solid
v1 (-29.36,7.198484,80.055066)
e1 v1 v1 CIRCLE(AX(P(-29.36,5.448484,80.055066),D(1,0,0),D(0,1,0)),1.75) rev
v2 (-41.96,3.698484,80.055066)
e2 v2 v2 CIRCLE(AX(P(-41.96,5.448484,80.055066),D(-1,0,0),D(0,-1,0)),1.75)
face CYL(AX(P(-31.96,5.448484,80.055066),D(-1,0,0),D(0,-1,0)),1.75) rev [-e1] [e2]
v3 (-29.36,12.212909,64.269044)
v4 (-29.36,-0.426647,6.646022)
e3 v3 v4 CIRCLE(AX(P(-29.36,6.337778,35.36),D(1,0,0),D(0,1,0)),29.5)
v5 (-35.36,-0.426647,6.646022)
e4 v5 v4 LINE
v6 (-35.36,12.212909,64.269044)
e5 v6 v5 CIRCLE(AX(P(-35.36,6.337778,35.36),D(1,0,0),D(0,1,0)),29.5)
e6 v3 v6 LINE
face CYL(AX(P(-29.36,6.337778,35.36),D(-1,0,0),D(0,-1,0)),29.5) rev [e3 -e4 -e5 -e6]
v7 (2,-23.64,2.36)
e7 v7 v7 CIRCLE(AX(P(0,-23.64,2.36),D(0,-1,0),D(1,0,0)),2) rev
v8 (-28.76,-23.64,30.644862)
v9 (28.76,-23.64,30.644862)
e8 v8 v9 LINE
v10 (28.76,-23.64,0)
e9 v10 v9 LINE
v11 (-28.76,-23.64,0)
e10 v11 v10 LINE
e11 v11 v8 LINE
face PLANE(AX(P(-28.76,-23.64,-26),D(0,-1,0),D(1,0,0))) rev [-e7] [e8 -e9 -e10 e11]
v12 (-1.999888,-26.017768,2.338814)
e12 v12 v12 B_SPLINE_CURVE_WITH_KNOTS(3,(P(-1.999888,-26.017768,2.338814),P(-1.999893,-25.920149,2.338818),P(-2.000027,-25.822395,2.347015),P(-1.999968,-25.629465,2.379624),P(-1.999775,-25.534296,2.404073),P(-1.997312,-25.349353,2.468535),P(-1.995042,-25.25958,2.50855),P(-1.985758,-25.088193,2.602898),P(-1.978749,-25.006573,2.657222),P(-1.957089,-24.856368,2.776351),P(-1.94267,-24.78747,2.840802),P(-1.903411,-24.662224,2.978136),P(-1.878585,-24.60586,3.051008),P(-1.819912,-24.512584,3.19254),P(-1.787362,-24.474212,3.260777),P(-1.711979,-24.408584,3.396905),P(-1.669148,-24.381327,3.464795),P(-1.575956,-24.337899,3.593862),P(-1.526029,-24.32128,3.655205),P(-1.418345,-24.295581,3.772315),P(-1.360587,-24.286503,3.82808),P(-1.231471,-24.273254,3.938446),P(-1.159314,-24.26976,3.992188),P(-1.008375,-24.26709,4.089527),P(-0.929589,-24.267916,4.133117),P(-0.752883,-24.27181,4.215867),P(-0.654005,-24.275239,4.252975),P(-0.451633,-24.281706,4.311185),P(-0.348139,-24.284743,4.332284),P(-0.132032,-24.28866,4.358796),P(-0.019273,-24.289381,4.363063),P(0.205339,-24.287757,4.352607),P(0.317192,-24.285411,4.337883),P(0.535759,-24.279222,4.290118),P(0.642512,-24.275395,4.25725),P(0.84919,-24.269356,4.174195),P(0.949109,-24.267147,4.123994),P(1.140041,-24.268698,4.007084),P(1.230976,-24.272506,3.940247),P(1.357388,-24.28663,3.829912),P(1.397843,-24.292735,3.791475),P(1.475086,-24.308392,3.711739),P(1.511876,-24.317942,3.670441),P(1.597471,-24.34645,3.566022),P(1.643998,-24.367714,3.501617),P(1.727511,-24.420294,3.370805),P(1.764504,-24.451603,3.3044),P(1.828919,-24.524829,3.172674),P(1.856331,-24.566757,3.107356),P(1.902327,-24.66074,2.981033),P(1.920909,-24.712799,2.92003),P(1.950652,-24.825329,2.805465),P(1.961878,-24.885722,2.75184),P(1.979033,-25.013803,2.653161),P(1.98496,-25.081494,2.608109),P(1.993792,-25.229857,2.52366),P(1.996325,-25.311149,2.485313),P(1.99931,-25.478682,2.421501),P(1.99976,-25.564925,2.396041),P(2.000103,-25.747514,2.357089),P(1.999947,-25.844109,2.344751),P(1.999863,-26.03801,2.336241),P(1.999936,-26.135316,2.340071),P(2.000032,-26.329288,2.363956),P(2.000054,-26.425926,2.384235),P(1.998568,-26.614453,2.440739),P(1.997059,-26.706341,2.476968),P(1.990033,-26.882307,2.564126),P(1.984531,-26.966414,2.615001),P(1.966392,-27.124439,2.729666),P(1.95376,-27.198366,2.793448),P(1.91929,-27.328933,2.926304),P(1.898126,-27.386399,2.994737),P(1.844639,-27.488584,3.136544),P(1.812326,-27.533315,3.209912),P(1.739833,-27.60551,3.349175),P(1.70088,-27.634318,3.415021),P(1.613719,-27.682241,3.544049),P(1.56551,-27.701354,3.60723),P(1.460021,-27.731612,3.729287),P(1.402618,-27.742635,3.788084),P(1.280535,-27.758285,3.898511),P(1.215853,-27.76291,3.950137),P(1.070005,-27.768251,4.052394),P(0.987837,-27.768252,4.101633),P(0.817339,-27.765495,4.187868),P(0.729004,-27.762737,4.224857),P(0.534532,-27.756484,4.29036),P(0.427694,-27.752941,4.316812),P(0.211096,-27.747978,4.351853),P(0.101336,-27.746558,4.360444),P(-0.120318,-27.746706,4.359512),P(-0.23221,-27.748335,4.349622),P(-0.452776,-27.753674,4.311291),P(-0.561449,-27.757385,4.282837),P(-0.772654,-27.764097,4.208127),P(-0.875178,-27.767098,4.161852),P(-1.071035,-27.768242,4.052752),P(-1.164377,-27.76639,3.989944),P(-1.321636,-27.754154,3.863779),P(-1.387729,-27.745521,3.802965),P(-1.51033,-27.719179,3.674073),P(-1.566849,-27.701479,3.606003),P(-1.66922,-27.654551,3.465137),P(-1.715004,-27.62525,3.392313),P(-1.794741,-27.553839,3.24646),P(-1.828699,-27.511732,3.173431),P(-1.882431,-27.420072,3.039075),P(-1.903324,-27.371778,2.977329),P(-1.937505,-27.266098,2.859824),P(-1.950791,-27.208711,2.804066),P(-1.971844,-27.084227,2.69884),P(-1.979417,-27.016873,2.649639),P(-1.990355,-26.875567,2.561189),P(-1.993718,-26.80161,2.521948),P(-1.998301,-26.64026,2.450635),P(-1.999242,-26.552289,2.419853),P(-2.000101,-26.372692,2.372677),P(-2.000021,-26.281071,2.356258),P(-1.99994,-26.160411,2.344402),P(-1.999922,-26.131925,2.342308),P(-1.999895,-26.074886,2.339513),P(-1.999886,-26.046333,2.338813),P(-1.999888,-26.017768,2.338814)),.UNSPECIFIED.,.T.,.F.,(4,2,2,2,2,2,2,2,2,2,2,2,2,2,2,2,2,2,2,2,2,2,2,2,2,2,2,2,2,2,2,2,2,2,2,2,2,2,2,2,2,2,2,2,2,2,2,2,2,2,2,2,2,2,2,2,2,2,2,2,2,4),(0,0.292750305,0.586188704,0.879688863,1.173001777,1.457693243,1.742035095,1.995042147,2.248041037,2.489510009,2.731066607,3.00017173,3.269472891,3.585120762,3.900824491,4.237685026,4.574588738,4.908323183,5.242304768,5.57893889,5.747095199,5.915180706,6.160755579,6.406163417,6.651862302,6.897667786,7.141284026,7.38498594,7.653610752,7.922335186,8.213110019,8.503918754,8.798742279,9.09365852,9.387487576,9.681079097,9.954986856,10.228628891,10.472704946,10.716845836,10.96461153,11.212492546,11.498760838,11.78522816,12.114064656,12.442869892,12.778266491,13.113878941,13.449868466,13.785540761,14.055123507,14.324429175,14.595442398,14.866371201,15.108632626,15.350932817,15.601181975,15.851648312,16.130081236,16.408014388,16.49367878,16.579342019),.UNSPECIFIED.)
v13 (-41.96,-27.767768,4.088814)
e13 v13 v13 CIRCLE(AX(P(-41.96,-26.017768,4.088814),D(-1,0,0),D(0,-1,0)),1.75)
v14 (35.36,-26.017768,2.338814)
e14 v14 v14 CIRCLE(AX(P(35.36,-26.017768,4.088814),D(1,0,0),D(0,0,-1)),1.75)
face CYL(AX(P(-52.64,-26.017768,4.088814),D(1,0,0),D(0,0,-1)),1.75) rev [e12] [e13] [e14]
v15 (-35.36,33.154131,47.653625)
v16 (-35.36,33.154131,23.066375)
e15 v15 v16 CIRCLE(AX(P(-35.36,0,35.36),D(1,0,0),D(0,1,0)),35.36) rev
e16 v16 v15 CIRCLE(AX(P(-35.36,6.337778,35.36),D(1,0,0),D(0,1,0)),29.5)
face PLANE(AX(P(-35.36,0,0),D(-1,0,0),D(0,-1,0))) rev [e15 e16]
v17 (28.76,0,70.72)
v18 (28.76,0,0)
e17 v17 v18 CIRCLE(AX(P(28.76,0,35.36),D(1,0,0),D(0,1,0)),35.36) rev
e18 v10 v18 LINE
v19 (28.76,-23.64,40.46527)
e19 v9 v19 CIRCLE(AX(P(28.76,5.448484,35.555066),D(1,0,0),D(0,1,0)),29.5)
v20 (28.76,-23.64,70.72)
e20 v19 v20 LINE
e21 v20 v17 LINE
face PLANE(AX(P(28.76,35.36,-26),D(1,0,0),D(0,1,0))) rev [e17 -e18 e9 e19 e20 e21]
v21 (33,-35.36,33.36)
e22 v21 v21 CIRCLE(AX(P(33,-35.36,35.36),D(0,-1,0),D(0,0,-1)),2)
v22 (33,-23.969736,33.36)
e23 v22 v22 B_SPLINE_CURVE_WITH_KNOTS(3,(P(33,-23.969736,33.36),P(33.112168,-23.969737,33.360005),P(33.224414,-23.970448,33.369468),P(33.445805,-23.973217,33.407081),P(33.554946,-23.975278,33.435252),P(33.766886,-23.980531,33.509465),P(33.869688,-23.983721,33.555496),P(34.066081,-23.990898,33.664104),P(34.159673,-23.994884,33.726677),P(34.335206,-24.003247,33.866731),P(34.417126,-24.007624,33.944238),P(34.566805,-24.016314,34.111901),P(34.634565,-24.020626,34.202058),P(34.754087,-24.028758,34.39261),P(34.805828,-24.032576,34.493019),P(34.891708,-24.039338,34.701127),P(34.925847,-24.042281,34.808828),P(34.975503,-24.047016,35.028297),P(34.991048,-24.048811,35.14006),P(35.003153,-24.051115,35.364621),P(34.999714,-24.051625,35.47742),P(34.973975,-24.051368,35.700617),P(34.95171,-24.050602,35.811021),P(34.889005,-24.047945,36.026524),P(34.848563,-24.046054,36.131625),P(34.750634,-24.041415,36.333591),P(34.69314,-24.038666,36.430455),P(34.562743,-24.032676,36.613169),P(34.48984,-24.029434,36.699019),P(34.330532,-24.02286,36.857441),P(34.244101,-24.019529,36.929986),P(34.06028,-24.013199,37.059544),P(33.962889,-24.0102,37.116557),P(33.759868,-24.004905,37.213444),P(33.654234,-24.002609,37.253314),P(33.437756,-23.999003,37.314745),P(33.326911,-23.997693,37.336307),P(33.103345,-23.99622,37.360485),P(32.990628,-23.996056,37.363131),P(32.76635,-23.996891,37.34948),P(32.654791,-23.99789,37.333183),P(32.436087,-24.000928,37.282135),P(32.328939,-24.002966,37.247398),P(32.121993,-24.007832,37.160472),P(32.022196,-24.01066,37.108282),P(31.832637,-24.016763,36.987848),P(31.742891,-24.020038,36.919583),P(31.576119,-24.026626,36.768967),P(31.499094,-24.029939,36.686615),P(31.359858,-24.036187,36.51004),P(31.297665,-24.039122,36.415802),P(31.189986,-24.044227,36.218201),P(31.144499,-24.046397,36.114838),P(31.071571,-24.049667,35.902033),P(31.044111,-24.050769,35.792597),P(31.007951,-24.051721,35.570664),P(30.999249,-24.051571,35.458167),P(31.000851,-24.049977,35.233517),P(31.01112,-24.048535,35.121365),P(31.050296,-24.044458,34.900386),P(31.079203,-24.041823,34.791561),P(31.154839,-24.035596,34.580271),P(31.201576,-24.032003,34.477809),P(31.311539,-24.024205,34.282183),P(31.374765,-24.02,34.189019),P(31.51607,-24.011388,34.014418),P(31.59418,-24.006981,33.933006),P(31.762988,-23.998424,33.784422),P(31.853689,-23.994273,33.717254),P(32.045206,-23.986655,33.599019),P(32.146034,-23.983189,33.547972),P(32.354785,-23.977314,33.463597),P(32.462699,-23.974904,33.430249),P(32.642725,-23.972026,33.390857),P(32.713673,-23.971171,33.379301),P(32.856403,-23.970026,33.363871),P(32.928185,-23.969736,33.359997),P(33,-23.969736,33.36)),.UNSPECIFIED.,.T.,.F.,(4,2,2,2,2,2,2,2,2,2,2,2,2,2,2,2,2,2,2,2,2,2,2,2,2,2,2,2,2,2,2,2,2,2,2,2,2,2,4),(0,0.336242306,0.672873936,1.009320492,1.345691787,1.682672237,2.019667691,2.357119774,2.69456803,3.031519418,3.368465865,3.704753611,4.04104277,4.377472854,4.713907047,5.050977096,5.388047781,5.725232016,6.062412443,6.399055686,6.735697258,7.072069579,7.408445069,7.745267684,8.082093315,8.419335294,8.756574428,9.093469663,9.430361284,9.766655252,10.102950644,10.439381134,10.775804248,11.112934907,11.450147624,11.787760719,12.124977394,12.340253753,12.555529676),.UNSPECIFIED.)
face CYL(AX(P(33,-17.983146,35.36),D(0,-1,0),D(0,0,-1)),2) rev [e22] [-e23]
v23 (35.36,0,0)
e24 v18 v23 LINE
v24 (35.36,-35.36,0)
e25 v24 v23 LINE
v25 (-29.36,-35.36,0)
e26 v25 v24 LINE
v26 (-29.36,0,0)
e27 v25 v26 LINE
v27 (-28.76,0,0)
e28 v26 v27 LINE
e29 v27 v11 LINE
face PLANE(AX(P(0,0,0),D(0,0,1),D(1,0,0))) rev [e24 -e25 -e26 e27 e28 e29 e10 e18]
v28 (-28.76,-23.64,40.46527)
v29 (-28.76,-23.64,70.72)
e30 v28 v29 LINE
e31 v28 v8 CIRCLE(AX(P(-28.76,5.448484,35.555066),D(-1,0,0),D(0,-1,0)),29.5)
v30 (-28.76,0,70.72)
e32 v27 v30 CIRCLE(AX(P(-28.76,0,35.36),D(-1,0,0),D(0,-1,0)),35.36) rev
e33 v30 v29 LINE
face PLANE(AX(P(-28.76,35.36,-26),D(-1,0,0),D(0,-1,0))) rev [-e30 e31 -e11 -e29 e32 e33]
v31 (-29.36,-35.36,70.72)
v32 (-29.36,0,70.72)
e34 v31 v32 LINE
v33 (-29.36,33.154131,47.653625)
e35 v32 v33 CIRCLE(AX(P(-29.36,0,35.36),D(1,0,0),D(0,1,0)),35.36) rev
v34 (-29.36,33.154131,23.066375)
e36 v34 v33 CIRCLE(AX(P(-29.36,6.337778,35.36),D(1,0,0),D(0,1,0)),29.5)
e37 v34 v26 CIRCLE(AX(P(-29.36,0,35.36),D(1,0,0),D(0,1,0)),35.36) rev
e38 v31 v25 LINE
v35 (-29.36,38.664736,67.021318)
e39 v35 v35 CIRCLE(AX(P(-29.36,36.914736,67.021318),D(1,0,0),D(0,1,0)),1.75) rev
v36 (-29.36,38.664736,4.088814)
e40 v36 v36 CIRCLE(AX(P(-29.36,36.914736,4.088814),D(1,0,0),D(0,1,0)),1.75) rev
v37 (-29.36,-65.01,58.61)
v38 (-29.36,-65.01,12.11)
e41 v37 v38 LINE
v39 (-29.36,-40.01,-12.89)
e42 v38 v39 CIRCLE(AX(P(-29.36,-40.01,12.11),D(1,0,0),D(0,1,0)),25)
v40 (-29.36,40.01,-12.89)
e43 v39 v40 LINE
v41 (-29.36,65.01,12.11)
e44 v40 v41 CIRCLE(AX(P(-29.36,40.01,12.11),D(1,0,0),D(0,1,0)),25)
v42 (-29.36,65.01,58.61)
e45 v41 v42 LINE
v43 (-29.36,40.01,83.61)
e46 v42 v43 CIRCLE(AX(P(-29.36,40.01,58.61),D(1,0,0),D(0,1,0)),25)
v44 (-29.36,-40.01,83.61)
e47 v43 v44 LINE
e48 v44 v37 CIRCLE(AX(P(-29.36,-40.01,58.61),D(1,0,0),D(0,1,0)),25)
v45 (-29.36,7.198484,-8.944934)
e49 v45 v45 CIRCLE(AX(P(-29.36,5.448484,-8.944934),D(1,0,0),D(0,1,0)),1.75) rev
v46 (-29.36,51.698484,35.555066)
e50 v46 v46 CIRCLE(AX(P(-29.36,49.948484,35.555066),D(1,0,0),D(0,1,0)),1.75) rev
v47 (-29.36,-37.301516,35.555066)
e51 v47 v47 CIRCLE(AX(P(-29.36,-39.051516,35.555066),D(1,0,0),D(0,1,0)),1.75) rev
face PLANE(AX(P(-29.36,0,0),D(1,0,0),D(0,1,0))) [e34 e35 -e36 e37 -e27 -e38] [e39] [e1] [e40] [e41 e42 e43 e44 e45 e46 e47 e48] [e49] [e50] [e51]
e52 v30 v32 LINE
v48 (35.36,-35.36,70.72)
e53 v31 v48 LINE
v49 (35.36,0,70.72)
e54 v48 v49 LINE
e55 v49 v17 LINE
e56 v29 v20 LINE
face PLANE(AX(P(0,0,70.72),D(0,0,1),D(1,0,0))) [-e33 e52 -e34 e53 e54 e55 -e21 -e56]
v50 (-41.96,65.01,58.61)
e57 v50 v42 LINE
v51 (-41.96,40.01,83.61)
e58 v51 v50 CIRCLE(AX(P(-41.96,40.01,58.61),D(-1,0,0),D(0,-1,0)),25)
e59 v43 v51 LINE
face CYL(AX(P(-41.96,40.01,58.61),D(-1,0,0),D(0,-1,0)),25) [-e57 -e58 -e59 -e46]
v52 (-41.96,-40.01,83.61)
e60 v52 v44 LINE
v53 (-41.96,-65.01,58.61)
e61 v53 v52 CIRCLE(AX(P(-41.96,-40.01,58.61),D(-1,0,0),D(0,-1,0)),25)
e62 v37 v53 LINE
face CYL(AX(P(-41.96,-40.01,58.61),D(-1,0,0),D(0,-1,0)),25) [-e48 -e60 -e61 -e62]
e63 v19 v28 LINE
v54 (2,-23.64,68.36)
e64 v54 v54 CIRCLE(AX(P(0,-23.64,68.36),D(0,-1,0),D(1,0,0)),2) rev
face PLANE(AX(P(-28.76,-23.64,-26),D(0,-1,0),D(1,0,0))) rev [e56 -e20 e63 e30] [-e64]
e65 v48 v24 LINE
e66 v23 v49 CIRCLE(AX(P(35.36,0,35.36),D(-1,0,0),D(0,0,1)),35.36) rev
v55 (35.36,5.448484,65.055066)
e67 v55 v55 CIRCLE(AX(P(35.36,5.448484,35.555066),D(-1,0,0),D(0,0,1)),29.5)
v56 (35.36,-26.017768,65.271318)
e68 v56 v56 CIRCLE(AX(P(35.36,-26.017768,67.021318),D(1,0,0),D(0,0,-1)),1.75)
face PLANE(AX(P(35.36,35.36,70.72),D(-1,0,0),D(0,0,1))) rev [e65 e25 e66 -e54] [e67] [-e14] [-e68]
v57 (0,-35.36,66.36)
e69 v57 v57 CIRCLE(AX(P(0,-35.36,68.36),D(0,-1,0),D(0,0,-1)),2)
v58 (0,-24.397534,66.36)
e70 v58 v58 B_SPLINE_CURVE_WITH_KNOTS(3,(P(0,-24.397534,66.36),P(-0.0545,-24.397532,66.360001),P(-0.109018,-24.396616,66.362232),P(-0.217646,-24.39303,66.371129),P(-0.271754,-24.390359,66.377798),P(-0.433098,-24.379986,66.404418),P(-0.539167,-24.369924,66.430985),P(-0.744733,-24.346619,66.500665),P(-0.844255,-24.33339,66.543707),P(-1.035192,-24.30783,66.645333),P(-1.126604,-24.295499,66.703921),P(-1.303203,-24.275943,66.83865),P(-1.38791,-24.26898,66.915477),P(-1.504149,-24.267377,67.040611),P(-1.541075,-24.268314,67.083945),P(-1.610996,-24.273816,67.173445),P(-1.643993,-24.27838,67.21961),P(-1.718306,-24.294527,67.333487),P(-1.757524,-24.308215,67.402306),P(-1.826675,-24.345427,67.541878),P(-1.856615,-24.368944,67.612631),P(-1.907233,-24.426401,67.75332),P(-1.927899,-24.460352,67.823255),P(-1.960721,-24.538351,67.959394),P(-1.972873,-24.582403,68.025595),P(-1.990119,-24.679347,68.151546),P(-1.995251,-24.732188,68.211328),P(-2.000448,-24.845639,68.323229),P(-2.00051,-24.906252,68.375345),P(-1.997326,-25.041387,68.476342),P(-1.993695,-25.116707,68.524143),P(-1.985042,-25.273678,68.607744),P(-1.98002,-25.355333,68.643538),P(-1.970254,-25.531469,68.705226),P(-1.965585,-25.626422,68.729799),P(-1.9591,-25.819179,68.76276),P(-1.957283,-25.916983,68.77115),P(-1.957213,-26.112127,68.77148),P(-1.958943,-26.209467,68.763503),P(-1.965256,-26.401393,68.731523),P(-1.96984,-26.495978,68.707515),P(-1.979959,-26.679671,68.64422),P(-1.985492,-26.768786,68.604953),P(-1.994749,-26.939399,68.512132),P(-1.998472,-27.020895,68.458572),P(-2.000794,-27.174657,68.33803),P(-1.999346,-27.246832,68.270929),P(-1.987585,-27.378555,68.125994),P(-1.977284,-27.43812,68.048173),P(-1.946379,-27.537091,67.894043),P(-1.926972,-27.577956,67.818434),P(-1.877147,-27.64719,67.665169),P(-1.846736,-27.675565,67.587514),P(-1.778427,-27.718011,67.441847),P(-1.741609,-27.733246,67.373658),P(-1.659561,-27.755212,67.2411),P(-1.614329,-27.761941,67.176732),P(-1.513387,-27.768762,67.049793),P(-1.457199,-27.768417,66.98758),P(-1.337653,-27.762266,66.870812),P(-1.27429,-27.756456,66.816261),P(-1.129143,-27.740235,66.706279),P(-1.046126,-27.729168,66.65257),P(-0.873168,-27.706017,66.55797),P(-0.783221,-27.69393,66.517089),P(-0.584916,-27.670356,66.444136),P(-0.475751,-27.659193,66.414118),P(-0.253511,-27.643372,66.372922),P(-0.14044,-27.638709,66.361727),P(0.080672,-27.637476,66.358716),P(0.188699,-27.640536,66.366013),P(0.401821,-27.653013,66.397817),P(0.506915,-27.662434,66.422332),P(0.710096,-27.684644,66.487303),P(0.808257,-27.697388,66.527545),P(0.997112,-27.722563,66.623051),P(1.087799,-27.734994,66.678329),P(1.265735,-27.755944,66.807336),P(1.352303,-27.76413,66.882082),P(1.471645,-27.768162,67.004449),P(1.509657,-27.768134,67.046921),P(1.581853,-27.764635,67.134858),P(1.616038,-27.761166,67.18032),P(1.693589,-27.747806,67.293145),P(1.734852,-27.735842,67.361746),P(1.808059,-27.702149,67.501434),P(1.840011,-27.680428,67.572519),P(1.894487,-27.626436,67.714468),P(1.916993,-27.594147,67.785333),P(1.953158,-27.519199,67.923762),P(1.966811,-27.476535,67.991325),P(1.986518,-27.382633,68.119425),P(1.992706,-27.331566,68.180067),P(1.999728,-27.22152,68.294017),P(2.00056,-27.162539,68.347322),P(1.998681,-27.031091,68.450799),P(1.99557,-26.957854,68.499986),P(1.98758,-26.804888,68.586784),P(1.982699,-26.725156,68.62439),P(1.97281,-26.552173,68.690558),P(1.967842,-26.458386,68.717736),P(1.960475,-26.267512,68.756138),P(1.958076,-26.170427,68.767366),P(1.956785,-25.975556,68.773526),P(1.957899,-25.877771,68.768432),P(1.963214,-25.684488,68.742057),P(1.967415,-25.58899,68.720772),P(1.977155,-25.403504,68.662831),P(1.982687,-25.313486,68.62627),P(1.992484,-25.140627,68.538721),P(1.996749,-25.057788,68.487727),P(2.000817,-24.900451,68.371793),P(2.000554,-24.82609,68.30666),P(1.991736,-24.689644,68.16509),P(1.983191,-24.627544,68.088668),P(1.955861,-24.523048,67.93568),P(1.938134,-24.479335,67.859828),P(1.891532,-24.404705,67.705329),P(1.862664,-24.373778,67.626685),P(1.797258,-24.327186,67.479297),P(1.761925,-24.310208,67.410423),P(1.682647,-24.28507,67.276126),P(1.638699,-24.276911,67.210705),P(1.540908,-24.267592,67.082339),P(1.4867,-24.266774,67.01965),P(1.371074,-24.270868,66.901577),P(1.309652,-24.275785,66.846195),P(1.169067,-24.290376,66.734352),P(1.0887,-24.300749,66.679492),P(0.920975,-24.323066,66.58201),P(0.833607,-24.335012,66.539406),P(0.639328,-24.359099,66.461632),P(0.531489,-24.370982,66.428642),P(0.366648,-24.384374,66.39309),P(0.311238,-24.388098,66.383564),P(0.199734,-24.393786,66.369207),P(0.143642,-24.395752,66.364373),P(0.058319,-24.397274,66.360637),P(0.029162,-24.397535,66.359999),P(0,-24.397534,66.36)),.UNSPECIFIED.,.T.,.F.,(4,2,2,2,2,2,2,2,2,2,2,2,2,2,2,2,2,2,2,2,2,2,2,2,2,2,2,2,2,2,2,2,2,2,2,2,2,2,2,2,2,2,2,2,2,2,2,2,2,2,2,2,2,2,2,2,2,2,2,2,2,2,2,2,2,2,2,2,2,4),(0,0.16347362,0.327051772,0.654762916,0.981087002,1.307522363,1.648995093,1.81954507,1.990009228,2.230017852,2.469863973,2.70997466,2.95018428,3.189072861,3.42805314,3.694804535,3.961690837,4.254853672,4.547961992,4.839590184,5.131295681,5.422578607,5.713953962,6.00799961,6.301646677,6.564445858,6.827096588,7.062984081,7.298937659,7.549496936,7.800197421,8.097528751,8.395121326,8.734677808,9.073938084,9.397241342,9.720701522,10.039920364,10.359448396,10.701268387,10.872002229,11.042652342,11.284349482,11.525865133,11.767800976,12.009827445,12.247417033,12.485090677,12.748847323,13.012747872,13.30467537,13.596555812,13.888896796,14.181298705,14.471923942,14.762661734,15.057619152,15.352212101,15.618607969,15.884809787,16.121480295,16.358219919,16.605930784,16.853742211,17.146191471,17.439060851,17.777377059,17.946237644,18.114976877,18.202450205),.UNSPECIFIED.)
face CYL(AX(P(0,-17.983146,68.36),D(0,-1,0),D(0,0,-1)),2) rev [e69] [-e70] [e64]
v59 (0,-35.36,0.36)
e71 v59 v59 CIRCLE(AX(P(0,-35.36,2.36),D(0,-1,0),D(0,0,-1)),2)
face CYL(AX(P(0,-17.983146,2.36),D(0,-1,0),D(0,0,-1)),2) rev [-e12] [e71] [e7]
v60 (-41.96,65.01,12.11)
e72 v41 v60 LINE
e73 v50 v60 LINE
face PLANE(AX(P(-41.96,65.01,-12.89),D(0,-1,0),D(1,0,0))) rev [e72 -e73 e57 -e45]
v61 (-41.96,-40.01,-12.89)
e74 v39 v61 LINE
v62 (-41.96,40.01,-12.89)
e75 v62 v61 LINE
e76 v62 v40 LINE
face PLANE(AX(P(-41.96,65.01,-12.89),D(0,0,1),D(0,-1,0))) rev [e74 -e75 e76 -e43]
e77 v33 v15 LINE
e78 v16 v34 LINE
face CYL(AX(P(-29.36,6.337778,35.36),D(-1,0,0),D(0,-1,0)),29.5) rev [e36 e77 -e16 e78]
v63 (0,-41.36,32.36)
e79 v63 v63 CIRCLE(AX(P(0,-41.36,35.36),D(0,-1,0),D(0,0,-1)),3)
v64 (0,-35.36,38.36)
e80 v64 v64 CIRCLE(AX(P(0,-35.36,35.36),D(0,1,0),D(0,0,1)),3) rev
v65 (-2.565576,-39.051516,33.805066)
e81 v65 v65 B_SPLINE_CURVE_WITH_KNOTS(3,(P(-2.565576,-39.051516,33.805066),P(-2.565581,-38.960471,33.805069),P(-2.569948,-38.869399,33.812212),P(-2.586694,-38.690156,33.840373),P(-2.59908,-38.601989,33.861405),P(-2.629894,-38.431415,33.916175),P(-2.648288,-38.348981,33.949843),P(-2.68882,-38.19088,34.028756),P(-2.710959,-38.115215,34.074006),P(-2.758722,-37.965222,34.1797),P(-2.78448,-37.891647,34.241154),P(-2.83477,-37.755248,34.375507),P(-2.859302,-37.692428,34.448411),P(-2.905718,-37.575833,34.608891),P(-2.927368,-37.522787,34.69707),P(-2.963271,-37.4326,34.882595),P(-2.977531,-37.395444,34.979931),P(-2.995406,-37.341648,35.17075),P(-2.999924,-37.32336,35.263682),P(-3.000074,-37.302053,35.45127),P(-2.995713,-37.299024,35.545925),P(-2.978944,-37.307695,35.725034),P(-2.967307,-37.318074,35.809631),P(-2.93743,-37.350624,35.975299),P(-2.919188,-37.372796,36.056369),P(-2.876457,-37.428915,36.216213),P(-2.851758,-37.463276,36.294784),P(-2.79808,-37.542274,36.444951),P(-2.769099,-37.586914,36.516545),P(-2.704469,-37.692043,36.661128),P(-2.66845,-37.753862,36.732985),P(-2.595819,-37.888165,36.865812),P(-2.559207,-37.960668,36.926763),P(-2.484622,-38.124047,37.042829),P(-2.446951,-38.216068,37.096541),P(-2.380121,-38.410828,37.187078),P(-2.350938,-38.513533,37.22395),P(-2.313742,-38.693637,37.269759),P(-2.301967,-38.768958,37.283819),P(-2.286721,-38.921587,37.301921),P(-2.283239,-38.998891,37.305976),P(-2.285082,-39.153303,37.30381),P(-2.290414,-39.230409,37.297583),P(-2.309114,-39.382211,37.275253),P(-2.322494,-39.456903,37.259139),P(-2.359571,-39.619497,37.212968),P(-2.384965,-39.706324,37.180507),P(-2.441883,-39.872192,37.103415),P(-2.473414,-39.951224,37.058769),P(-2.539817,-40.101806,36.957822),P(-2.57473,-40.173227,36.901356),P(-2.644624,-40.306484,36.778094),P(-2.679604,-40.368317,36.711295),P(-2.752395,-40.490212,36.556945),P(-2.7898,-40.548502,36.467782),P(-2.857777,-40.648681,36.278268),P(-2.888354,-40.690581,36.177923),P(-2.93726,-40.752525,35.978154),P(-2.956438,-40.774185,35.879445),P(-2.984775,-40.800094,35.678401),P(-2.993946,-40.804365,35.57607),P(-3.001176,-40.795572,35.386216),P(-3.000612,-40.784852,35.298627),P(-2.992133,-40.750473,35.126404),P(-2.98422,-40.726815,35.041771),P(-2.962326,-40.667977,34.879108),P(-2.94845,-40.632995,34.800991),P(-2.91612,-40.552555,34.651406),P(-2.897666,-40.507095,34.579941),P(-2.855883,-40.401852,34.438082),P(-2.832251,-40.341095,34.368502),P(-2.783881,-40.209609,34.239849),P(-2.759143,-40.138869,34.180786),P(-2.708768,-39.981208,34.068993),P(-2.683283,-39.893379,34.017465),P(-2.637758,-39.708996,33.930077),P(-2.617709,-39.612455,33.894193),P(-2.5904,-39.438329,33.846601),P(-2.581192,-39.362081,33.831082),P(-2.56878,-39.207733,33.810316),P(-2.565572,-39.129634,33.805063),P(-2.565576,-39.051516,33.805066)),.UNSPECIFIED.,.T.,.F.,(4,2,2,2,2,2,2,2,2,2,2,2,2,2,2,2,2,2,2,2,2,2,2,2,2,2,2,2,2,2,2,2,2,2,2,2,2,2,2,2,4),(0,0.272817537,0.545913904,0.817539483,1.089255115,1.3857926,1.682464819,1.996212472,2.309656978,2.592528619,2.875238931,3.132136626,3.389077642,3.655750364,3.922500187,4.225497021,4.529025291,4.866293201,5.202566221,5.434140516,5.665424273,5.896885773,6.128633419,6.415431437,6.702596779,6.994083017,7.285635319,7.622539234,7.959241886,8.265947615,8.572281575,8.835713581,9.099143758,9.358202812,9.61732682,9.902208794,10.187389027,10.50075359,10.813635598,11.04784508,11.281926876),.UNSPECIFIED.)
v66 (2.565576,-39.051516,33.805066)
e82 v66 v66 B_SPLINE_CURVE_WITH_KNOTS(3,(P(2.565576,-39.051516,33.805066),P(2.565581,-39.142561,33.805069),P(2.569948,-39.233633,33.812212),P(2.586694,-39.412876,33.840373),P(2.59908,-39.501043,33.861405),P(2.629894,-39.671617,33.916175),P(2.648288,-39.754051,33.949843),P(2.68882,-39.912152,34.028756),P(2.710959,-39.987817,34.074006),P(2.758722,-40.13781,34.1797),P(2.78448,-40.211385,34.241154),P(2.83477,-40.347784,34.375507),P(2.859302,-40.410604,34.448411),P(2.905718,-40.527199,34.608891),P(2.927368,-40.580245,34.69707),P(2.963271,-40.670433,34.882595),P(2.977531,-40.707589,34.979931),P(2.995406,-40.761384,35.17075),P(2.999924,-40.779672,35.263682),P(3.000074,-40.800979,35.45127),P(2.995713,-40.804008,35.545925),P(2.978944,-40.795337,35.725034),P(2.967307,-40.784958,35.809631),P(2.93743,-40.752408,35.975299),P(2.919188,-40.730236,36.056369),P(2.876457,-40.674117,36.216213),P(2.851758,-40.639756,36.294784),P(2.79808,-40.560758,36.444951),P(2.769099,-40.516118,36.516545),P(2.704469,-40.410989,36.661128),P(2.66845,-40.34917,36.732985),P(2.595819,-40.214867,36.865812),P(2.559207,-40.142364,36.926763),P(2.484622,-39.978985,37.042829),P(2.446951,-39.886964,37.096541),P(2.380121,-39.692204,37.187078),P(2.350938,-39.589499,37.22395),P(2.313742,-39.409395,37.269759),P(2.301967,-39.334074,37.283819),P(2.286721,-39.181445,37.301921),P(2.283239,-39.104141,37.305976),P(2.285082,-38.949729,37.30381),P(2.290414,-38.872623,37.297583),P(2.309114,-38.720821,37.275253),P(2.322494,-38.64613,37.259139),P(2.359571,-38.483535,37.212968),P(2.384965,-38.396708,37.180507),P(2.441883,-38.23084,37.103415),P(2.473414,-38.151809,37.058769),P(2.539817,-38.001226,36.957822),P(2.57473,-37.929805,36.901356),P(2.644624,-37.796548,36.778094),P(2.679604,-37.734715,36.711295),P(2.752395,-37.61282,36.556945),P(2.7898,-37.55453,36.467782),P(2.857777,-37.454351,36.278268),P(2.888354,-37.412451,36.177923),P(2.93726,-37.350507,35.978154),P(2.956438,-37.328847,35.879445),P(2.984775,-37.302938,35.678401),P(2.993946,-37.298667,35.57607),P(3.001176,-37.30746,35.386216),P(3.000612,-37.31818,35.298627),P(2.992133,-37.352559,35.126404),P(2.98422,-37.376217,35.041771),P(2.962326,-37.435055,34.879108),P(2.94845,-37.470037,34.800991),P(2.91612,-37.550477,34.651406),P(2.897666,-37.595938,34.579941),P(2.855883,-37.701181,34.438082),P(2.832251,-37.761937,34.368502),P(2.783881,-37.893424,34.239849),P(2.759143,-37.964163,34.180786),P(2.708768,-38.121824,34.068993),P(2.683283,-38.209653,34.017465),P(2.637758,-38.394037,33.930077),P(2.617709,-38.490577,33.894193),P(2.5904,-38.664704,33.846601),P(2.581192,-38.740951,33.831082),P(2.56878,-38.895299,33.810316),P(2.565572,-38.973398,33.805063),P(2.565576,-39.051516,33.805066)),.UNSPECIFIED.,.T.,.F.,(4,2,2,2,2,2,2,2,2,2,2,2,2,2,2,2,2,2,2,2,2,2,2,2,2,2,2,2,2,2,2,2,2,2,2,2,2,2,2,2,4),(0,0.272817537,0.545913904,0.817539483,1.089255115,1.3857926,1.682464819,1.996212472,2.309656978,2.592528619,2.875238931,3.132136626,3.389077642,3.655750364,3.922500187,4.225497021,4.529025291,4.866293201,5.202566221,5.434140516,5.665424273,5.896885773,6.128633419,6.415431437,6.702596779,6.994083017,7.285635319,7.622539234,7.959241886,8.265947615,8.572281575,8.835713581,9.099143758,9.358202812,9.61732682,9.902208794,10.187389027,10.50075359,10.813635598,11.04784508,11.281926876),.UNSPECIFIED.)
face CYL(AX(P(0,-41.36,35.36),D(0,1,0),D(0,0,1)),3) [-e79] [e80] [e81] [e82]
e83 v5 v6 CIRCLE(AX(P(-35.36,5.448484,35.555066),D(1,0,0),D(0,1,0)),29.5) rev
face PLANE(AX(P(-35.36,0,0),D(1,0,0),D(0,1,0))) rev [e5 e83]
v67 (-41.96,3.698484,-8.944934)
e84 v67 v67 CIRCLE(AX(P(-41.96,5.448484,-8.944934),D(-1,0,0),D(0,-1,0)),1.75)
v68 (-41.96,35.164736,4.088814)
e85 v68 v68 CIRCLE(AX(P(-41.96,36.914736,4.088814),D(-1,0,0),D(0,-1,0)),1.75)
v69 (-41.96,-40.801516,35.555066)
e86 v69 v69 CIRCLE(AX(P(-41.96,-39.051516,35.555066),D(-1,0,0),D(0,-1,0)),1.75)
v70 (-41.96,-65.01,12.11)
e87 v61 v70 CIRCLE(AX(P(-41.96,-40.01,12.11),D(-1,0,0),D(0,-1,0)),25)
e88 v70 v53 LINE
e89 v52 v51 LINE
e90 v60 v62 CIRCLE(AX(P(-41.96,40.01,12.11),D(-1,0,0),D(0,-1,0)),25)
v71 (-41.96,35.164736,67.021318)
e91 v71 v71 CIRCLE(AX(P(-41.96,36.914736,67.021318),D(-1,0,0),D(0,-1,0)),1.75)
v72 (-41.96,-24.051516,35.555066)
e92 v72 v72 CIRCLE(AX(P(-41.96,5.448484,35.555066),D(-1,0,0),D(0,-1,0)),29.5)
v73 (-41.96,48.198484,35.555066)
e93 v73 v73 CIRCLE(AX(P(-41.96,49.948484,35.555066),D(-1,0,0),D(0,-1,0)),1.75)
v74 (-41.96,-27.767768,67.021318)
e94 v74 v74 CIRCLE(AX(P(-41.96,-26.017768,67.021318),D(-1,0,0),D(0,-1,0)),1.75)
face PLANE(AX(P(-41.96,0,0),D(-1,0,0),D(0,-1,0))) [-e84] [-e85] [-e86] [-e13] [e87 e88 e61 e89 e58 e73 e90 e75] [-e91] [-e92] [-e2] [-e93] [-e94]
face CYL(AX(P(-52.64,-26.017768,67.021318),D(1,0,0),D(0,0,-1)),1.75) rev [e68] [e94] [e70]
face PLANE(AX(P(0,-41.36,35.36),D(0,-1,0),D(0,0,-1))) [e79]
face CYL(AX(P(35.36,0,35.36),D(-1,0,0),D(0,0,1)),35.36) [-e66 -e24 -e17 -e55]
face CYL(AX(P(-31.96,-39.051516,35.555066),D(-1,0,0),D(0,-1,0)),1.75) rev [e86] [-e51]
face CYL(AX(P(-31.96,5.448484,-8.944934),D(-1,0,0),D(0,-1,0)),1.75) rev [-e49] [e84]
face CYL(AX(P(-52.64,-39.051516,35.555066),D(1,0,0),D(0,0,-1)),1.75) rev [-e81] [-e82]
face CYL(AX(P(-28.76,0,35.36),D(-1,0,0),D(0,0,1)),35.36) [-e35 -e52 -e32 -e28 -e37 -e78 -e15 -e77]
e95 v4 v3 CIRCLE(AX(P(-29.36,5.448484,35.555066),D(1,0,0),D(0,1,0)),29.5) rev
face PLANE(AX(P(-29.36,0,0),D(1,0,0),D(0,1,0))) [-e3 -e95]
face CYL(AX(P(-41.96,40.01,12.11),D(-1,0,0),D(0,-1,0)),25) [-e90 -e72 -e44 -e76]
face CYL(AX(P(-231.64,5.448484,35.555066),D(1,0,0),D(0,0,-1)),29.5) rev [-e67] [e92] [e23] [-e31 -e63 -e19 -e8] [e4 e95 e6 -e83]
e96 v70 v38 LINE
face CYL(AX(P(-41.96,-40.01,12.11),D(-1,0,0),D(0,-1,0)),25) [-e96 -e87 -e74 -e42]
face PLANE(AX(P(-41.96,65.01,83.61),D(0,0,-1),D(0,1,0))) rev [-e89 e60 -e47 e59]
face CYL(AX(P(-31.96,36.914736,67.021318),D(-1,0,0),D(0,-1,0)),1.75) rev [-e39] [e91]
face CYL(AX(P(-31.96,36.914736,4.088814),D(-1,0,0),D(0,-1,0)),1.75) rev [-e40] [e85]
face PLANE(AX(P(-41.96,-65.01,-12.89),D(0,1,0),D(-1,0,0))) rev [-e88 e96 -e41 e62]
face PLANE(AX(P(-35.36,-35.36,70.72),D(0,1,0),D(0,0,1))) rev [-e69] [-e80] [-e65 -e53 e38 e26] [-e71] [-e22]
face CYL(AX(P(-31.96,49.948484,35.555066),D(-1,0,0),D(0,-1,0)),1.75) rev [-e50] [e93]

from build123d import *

# Parameters (mm, degrees)
SKETCH_1_W               = 70.72
SKETCH_1_H               = 70.72
EXTRUDE_1_DEPTH          = 70.72
CUT_EXTRUDE_2_DEPTH      = 125.72
CUT_EXTRUDE_2_DEPTH_BACK = 26
SKETCH_2_W               = 57.52
SKETCH_2_H               = 59
FILLET_1_RADIUS          = 35.36
FILLET_1_LENGTH          = 6.6
FILLET_2_RADIUS          = 35.36
FILLET_2_LENGTH          = 6.6
CUT_EXTRUDE_4_DEPTH      = 1
CUT_EXTRUDE_4_DEPTH_BACK = 267
SKETCH_3_R               = 29.5
SKETCH_8_R               = 3
EXTRUDE_2_DEPTH          = 6
SKETCH_11_R              = 1.75
CUT_EXTRUDE_5_DEPTH      = 88
SKETCH_14_W              = 96.5
SKETCH_14_H              = 130.02
EXTRUDE_3_DEPTH          = 6.6
SKETCH_21_R              = 29.5
CUT_EXTRUDE_7_DEPTH      = 51
CUT_EXTRUDE_START        = -10
SKETCH_24_R              = 1.75
CUT_EXTRUDE_8_DEPTH      = 10
EXTRUDE_4_OUTLINE_W      = 96.5
EXTRUDE_4_OUTLINE_H      = 130.02
EXTRUDE_4_DEPTH          = 6
CUT_EXTRUDE_START_2      = 32
SKETCH_27_R              = 1.75
CUT_EXTRUDE_13_DEPTH     = 32
CUT_EXTRUDE_15_REACH     = 139.206
SKETCH_29_R              = 2
FILLET_3_R               = 25
FILLET_4_R               = 25
FILLET_5_R               = 25
FILLET_6_R               = 25


# Read off the part's stored shape, not the designer's step: 凸台-拉伸4
with BuildPart() as part:
    # 草图1 → 凸台-拉伸1 (new body)
    with BuildSketch(Plane.XY):
        Rectangle(SKETCH_1_W, SKETCH_1_H)
    extrude(amount=EXTRUDE_1_DEPTH)

    # 草图2 → 切除-拉伸2 (cut, two sides: drawn at the far end of the back side and taken through both)
    with BuildSketch(Plane.XY.offset(-CUT_EXTRUDE_2_DEPTH_BACK)):
        with Locations((0, 5.86)):
            Rectangle(SKETCH_2_W, SKETCH_2_H)
    extrude(amount=CUT_EXTRUDE_2_DEPTH + CUT_EXTRUDE_2_DEPTH_BACK, mode=Mode.SUBTRACT)

    # 圆角1: full round fillet: the end face becomes a half cylinder, R = half its width
    fillet_1_face = Plane((-32.06, 35.36, 35.36), x_dir=(-1, 0, 0), z_dir=(0, 1, 0))  # on the end face: x along it, z out of the body
    fillet_1_slab = fillet_1_face.offset(-FILLET_1_RADIUS / 2) * Box(FILLET_1_LENGTH, 2 * FILLET_1_RADIUS, FILLET_1_RADIUS, mode=Mode.PRIVATE)  # the body's end, R deep
    fillet_1_round = Plane((-32.06, 0, 35.36), x_dir=(0, 1, 0), z_dir=(-1, 0, 0)) * Cylinder(FILLET_1_RADIUS, FILLET_1_LENGTH, mode=Mode.PRIVATE)  # its axis R under the face
    add(fillet_1_slab - fillet_1_round, mode=Mode.SUBTRACT)

    # 圆角2: full round fillet: the end face becomes a half cylinder, R = half its width
    fillet_2_face = Plane((32.06, 35.36, 35.36), x_dir=(-1, 0, 0), z_dir=(0, 1, 0))  # on the end face: x along it, z out of the body
    fillet_2_slab = fillet_2_face.offset(-FILLET_2_RADIUS / 2) * Box(FILLET_2_LENGTH, 2 * FILLET_2_RADIUS, FILLET_2_RADIUS, mode=Mode.PRIVATE)  # the body's end, R deep
    fillet_2_round = Plane((32.06, 0, 35.36), x_dir=(0, 1, 0), z_dir=(-1, 0, 0)) * Cylinder(FILLET_2_RADIUS, FILLET_2_LENGTH, mode=Mode.PRIVATE)  # its axis R under the face
    add(fillet_2_slab - fillet_2_round, mode=Mode.SUBTRACT)

    # 草图3 → 切除-拉伸4 (cut, two sides: drawn at the far end of the back side and taken through both)
    with BuildSketch(Plane(origin=(35.36, 0, 0), x_dir=(0, 0, -1), z_dir=(1, 0, 0)).offset(-CUT_EXTRUDE_4_DEPTH_BACK)):
        with Locations(Location((-35.555066, 5.448484, 0), (0, 0, 90))):
            Circle(SKETCH_3_R)
    extrude(amount=CUT_EXTRUDE_4_DEPTH + CUT_EXTRUDE_4_DEPTH_BACK, mode=Mode.SUBTRACT)

    # 草图8 → 凸台-拉伸2 (add)
    with BuildSketch(Plane.XZ.offset(35.36)):
        with Locations(Location((0, 35.36, 0), (0, 0, 90))):
            Circle(SKETCH_8_R)
    extrude(amount=EXTRUDE_2_DEPTH)

    # 草图11 → 切除-拉伸5 (cut)
    with BuildSketch(Plane(origin=(35.36, 0, 0), x_dir=(0, 0, -1), z_dir=(1, 0, 0))):
        with Locations((-35.555066, -39.051516)):
            Circle(SKETCH_11_R)
        with Locations((-67.021318, -26.017768)):
            Circle(SKETCH_11_R)
        with Locations((-80.055066, 5.448484)):
            Circle(SKETCH_11_R)
        with Locations((-67.021318, 36.914736)):
            Circle(SKETCH_11_R)
        with Locations((-35.555066, 49.948484)):
            Circle(SKETCH_11_R)
        with Locations((-4.088814, 36.914736)):
            Circle(SKETCH_11_R)
        with Locations((8.944934, 5.448484)):
            Circle(SKETCH_11_R)
        with Locations((-4.088814, -26.017768)):
            Circle(SKETCH_11_R)
    extrude(amount=-CUT_EXTRUDE_5_DEPTH, mode=Mode.SUBTRACT)

    # 草图14 → 凸台-拉伸3 (add)
    with BuildSketch(Plane.ZY.offset(35.36)):
        with Locations((35.36, 0)):
            Rectangle(SKETCH_14_W, SKETCH_14_H)
    extrude(amount=EXTRUDE_3_DEPTH)

    # 草图21 → 切除-拉伸7 (cut)
    with BuildSketch(Plane(origin=(-35.36, 0, 0), x_dir=(0, 0, -1), z_dir=(1, 0, 0))):
        with Locations(Location((-35.555066, 5.448484, 0), (0, 0, 270))):
            Circle(SKETCH_21_R)
    extrude(amount=-CUT_EXTRUDE_7_DEPTH, mode=Mode.SUBTRACT)

    # 草图24 → 切除-拉伸8 (cut)
    with BuildSketch(Plane.ZY.offset(41.96).offset(CUT_EXTRUDE_START)):
        with Locations(Location((35.555066, 49.948484, 0), (0, 0, 270))):
            Circle(SKETCH_24_R)
        with Locations(Location((67.021318, 36.914736, 0), (0, 0, 270))):
            Circle(SKETCH_24_R)
        with Locations(Location((80.055066, 5.448484, 0), (0, 0, 270))):
            Circle(SKETCH_24_R)
        with Locations(Location((67.021318, -26.017768, 0), (0, 0, 180))):
            Circle(SKETCH_24_R)
        with Locations(Location((35.555066, -39.051516, 0), (0, 0, 180))):
            Circle(SKETCH_24_R)
        with Locations(Location((4.088814, -26.017768, 0), (0, 0, 180))):
            Circle(SKETCH_24_R)
        with Locations(Location((-8.944934, 5.448484, 0), (0, 0, 270))):
            Circle(SKETCH_24_R)
        with Locations(Location((4.088814, 36.914736, 0), (0, 0, 270))):
            Circle(SKETCH_24_R)
    extrude(amount=CUT_EXTRUDE_8_DEPTH, mode=Mode.SUBTRACT)

    # 凸台-拉伸4 outline → 凸台-拉伸4 (add)
    with BuildSketch(Plane(origin=(-35.36, 0, 0), x_dir=(0, 0, -1), z_dir=(1, 0, 0))):
        with Locations((-35.36, 0)):
            Rectangle(EXTRUDE_4_OUTLINE_W, EXTRUDE_4_OUTLINE_H)
        with BuildLine():
            ThreePointArc((-6.646022, -0.426647), (-41.68053, -22.477164), (-64.269044, 12.212909))
            ThreePointArc((-64.269044, 12.212909), (-29.234536, 34.263426), (-6.646022, -0.426647))
        make_face(mode=Mode.SUBTRACT)
        with BuildLine():
            ThreePointArc((-23.066375, 33.154131), (-35.36, 35.36), (-47.653625, 33.154131))
            ThreePointArc((-47.653625, 33.154131), (-35.36, 35.837778), (-23.066375, 33.154131))
        make_face(mode=Mode.SUBTRACT)
    extrude(amount=EXTRUDE_4_DEPTH)

    # 草图27 → 切除-拉伸13 (cut)
    with BuildSketch(Plane(origin=(-35.36, 0, 0), x_dir=(0, 0, -1), z_dir=(1, 0, 0)).offset(CUT_EXTRUDE_START_2)):
        with Locations(Location((-35.555066, 49.948484, 0), (0, 0, 270))):
            Circle(SKETCH_27_R)
        with Locations(Location((-4.088814, 36.914736, 0), (0, 0, 270))):
            Circle(SKETCH_27_R)
        with Locations(Location((8.944934, 5.448484, 0), (0, 0, 270))):
            Circle(SKETCH_27_R)
        with Locations((-4.088814, -26.017768)):
            Circle(SKETCH_27_R)
        with Locations((-35.555066, -39.051516)):
            Circle(SKETCH_27_R)
        with Locations((-67.021318, -26.017768)):
            Circle(SKETCH_27_R)
        with Locations(Location((-80.055066, 5.448484, 0), (0, 0, 270))):
            Circle(SKETCH_27_R)
        with Locations(Location((-67.021318, 36.914736, 0), (0, 0, 270))):
            Circle(SKETCH_27_R)
    extrude(amount=-CUT_EXTRUDE_13_DEPTH, mode=Mode.SUBTRACT)

    # 切除-拉伸15: up to this face of the body (flat: up to its plane)
    cut_extrude_15_end = Plane(part.part.faces().sort_by_distance((0, -23.64, 15.322431))[0])
    # 草图29 → 切除-拉伸15 (cut, up to the picked face)
    with BuildSketch(Plane(origin=(0, -35.36, 0), x_dir=(-1, 0, 0), z_dir=(0, -1, 0)), mode=Mode.PRIVATE) as cut_extrude_15_sk1:
        with Locations(Location((0, -68.36, 0), (0, 0, 90))):
            Circle(SKETCH_29_R)
    cut_extrude_15_tool1 = split(extrude(cut_extrude_15_sk1.sketch, amount=-CUT_EXTRUDE_15_REACH, mode=Mode.PRIVATE), bisect_by=cut_extrude_15_end, keep=Keep.BOTH, mode=Mode.PRIVATE)
    # 草图29 → 切除-拉伸15 (cut, up to the picked face)
    with BuildSketch(Plane(origin=(0, -35.36, 0), x_dir=(-1, 0, 0), z_dir=(0, -1, 0)), mode=Mode.PRIVATE) as cut_extrude_15_sk2:
        with Locations(Location((-33, -35.36, 0), (0, 0, 90))):
            Circle(SKETCH_29_R)
    cut_extrude_15_tool2 = split(extrude(cut_extrude_15_sk2.sketch, amount=-CUT_EXTRUDE_15_REACH, mode=Mode.PRIVATE), bisect_by=cut_extrude_15_end, keep=Keep.BOTH, mode=Mode.PRIVATE)
    # 草图29 → 切除-拉伸15 (cut, up to the picked face)
    with BuildSketch(Plane(origin=(0, -35.36, 0), x_dir=(-1, 0, 0), z_dir=(0, -1, 0)), mode=Mode.PRIVATE) as cut_extrude_15_sk3:
        with Locations(Location((0, -2.36, 0), (0, 0, 90))):
            Circle(SKETCH_29_R)
    cut_extrude_15_tool3 = split(extrude(cut_extrude_15_sk3.sketch, amount=-CUT_EXTRUDE_15_REACH, mode=Mode.PRIVATE), bisect_by=cut_extrude_15_end, keep=Keep.BOTH, mode=Mode.PRIVATE)
    add(cut_extrude_15_tool1.solids().sort_by(Axis((0, -35.36, 68.36), (0, 1, 0)))[0], mode=Mode.SUBTRACT)
    add(cut_extrude_15_tool2.solids().sort_by(Axis((33, -35.36, 35.36), (0, 1, 0)))[0], mode=Mode.SUBTRACT)
    add(cut_extrude_15_tool3.solids().sort_by(Axis((0, -35.36, 2.36), (0, 1, 0)))[0], mode=Mode.SUBTRACT)

    # 圆角3
    fillet_3_edges = [part.edges().sort_by_distance(p)[0] for p in [
        (-35.66, 65.01, -12.89),
    ]]
    fillet(fillet_3_edges, radius=FILLET_3_R)

    # 圆角4
    fillet_4_edges = [part.edges().sort_by_distance(p)[0] for p in [
        (-35.66, 65.01, 83.61),
    ]]
    fillet(fillet_4_edges, radius=FILLET_4_R)

    # 圆角5
    fillet_5_edges = [part.edges().sort_by_distance(p)[0] for p in [
        (-35.66, -65.01, -12.89),
    ]]
    fillet(fillet_5_edges, radius=FILLET_5_R)

    # 圆角6
    fillet_6_edges = [part.edges().sort_by_distance(p)[0] for p in [
        (-35.66, -65.01, 83.61),
    ]]
    fillet(fillet_6_edges, radius=FILLET_6_R)


solid = part.part
